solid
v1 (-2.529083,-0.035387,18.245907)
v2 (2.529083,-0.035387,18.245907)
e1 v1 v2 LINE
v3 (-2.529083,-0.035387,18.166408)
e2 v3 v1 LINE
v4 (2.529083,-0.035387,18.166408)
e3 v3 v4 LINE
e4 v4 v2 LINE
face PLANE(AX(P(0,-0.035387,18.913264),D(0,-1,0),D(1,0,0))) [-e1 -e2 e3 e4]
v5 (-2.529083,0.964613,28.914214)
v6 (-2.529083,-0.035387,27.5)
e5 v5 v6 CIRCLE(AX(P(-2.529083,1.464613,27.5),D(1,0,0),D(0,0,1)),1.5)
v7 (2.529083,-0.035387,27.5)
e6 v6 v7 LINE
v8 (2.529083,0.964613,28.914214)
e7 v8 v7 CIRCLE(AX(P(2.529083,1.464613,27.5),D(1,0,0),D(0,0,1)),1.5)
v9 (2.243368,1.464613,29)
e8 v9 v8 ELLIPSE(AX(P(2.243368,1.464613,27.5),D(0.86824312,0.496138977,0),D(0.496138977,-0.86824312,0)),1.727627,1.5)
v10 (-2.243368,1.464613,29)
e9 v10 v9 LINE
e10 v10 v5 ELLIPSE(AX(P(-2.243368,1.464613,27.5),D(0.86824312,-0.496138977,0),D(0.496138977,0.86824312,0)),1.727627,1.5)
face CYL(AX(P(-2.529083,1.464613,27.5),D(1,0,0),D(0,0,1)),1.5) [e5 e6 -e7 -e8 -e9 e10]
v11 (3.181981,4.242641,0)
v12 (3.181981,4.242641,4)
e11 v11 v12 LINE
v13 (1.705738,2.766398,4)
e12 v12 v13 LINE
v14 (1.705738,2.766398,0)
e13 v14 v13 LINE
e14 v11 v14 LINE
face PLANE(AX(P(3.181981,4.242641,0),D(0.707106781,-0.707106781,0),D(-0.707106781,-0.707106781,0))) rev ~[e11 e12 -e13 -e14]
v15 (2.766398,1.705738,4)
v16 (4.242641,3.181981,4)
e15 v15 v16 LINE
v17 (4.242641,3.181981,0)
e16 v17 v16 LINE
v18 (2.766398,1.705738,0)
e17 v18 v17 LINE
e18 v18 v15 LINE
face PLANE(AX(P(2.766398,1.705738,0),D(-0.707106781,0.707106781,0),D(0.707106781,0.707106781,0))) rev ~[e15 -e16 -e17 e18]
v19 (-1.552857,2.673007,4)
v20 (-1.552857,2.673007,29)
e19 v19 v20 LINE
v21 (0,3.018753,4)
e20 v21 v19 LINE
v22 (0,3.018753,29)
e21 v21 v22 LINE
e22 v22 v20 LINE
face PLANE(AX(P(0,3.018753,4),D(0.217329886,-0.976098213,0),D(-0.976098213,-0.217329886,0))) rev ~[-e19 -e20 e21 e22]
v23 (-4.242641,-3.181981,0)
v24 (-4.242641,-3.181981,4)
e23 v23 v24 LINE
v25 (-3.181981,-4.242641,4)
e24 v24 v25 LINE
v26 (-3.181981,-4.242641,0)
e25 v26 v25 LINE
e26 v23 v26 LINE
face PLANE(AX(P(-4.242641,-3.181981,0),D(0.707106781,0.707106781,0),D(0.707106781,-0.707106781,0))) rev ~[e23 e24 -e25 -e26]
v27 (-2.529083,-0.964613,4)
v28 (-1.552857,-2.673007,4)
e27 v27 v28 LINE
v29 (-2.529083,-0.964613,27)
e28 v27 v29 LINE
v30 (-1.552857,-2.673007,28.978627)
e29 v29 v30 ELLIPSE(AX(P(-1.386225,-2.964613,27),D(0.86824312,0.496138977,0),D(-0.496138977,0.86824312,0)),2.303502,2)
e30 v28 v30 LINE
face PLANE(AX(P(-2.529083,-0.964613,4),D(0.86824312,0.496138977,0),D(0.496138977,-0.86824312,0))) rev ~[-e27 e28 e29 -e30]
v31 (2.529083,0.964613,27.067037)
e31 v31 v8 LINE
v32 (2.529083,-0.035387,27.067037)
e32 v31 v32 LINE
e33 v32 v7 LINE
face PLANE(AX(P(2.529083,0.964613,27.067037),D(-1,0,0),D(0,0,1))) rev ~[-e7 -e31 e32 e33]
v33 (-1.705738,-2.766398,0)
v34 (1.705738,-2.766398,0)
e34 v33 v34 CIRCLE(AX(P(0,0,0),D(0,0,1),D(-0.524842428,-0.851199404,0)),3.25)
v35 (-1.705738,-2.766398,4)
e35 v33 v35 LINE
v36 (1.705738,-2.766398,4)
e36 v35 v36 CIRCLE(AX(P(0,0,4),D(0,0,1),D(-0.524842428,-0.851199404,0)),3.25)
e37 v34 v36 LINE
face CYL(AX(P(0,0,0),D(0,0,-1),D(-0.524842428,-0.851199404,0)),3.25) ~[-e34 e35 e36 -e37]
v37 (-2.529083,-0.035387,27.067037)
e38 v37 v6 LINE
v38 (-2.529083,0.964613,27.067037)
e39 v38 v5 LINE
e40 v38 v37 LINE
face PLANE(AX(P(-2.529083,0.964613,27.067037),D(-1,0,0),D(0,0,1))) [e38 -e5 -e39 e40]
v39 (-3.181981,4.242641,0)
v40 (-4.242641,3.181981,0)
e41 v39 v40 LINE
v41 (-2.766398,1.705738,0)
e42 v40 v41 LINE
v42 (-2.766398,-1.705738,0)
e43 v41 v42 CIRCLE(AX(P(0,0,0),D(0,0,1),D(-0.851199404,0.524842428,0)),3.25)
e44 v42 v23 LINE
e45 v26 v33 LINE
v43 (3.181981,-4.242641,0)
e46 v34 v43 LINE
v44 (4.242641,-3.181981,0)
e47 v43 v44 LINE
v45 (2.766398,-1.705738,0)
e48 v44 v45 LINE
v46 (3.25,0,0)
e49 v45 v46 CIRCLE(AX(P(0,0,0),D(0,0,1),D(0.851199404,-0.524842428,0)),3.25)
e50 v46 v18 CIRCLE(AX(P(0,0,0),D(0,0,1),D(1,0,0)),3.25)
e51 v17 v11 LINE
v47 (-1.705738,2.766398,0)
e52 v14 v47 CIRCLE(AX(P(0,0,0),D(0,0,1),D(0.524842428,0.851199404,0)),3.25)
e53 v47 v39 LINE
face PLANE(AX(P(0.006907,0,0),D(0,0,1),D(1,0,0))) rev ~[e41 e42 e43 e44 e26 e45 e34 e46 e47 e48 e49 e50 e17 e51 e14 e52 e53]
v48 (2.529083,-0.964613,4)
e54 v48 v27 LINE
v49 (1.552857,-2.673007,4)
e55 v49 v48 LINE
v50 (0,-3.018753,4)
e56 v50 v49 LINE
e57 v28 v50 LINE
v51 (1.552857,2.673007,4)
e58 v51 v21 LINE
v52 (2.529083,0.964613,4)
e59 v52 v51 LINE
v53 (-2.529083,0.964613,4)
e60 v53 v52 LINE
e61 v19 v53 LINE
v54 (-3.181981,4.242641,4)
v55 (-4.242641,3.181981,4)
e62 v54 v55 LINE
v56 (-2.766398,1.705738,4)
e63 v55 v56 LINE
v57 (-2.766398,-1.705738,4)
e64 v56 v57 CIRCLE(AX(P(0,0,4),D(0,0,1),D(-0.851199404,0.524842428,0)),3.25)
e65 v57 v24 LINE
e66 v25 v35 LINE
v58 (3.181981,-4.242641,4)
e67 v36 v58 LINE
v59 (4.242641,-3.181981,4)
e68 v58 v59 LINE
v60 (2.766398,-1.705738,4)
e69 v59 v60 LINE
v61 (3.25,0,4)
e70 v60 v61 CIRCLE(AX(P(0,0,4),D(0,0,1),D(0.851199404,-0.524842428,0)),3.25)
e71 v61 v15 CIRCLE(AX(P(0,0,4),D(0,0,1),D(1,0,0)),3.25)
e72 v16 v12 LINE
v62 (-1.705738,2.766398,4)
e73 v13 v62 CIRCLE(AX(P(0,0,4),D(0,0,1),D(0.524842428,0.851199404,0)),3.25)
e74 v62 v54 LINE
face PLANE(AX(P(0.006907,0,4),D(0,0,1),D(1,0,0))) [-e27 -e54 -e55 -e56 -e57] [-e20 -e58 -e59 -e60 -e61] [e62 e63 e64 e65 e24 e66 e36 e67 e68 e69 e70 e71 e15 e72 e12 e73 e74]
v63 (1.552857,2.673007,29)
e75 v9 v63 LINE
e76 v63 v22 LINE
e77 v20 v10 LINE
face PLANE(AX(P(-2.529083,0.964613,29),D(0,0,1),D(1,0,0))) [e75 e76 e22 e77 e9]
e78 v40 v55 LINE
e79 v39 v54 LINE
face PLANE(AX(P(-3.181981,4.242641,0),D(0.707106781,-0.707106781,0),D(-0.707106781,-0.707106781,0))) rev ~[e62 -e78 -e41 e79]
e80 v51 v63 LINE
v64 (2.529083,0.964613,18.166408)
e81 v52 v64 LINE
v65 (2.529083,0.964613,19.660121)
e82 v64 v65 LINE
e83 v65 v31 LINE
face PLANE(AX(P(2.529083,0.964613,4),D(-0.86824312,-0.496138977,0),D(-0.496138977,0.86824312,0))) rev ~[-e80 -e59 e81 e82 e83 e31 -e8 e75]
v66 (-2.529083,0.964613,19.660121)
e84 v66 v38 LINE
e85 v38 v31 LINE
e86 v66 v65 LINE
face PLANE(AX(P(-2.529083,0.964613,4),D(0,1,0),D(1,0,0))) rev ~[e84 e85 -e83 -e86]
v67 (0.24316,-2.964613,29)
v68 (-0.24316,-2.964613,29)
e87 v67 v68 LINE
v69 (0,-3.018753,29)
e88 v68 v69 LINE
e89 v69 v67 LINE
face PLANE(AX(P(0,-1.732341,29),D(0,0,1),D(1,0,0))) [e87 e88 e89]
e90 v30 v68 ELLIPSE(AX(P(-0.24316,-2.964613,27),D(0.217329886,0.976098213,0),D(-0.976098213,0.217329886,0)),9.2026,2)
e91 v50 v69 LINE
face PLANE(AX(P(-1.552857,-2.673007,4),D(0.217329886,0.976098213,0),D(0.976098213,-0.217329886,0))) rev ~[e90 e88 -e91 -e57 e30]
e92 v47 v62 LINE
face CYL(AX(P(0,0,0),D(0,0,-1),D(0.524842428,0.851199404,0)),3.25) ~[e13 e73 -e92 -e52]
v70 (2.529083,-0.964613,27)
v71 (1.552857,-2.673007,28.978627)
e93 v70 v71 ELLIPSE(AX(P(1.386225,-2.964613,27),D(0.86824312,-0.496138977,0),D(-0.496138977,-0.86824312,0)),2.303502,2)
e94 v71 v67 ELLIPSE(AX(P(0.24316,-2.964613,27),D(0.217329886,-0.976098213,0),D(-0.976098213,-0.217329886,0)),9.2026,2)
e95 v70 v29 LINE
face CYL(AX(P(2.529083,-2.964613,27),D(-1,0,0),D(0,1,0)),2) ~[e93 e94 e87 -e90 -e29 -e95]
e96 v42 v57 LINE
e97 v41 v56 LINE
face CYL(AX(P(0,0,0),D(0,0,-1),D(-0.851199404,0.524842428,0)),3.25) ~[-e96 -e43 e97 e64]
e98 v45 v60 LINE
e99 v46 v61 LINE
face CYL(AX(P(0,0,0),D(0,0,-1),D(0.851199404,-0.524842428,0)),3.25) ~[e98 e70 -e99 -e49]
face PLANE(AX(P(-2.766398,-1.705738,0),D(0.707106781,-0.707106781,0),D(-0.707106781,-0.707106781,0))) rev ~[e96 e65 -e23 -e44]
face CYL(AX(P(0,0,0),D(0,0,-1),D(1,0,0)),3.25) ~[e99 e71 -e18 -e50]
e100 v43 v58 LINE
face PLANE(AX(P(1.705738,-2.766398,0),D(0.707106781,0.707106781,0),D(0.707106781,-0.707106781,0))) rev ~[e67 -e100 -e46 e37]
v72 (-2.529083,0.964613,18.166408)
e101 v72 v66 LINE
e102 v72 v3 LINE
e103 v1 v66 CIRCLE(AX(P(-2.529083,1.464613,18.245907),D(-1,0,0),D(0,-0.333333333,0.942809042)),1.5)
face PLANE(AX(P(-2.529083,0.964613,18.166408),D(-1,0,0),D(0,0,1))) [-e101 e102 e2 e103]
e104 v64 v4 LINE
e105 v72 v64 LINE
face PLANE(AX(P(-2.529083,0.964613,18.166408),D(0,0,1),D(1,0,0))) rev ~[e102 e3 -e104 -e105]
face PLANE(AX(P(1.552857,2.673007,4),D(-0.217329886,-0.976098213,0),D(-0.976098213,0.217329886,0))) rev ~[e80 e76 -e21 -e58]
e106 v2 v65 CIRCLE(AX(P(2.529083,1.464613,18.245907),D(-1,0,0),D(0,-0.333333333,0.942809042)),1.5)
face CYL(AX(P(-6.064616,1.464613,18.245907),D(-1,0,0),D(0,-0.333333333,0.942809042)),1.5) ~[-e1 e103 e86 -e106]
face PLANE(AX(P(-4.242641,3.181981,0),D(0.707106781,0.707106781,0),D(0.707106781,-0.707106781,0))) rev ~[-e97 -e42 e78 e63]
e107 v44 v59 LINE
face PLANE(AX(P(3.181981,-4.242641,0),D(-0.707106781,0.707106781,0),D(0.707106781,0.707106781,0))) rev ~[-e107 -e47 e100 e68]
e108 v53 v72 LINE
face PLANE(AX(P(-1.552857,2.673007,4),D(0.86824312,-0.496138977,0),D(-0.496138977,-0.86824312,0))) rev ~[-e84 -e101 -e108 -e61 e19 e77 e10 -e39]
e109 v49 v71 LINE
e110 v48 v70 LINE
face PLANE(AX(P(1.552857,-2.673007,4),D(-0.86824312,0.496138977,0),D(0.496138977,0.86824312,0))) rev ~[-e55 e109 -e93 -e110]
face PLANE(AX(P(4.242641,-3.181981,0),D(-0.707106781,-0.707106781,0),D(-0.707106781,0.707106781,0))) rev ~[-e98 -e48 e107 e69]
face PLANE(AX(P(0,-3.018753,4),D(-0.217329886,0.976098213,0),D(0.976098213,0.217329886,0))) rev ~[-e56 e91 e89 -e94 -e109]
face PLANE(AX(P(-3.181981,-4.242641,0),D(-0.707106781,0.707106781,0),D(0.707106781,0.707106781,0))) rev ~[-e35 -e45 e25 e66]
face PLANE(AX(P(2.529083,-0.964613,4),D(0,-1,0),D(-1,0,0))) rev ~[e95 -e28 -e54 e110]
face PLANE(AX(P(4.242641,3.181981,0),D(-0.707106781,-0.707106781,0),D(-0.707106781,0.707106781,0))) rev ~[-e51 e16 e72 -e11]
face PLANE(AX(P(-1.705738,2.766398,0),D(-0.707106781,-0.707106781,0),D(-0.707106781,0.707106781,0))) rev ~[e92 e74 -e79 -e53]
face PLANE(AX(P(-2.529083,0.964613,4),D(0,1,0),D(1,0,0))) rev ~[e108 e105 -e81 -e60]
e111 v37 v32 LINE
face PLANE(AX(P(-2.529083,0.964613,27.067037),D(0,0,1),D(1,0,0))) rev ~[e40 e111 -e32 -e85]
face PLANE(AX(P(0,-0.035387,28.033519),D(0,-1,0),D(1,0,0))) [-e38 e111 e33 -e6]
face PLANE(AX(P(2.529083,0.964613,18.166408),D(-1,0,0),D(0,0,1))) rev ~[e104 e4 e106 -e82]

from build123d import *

# Parameters (mm, degrees)
F1_DEPTH     = 4
F3_DEPTH     = 25
F4_R         = 2
F5_W         = 5.058165174
F5_H         = 1.9329627007
F6_DEPTH     = 1
F7_R         = 1.5
F8_W         = 5.058165174
F8_H         = 1.4937128872
F9_DEPTH     = 1
F10_T1_DEPTH = 12.1292329858


# Not quite as in the source:
# - a fillet or chamfer that OpenCascade refuses, or shapes differently, is made with other operations: its cross-section is extruded or revolved along the edge and cut away or added


with BuildPart() as f1:
    # F0 (on Top) → F1 (new body)
    with BuildSketch(Plane.XY):
        with BuildLine():
            ThreePointArc((2.7663980634, -1.7057378916), (3.1267629992, -0.8864835853), (3.25, 0))
            ThreePointArc((3.25, 0), (3.1267629992, 0.8864835853), (2.7663980634, 1.7057378916))
            ThreePointArc((2.7663980634, 1.7057378916), (2.2980970389, 2.2980970389), (1.7057378916, 2.7663980634))
            ThreePointArc((1.7057378916, 2.7663980634), (0, 3.25), (-1.7057378916, 2.7663980634))
            ThreePointArc((-1.7057378916, 2.7663980634), (-2.2980970389, 2.2980970389), (-2.7663980634, 1.7057378916))
            ThreePointArc((-2.7663980634, 1.7057378916), (-3.25, 0), (-2.7663980634, -1.7057378916))
            ThreePointArc((-2.7663980634, -1.7057378916), (-2.2980970389, -2.2980970389), (-1.7057378916, -2.7663980634))
            ThreePointArc((-1.7057378916, -2.7663980634), (0, -3.25), (1.7057378916, -2.7663980634))
            ThreePointArc((1.7057378916, -2.7663980634), (2.2980970389, -2.2980970389), (2.7663980634, -1.7057378916))
        make_face()
        with BuildLine():
            ThreePointArc((1.7057378916, 2.7663980634), (2.2980970389, 2.2980970389), (2.7663980634, 1.7057378916))
            Line((2.7663980634, 1.7057378916), (4.2426406871, 3.1819805153))
            Line((4.2426406871, 3.1819805153), (3.7123106012, 3.7123106012))
            Line((3.7123106012, 3.7123106012), (3.1819805153, 4.2426406871))
            Line((3.1819805153, 4.2426406871), (1.7057378916, 2.7663980634))
        make_face()
        with BuildLine():
            Line((4.2426406871, -3.1819805153), (2.7663980634, -1.7057378916))
            ThreePointArc((2.7663980634, -1.7057378916), (2.2980970389, -2.2980970389), (1.7057378916, -2.7663980634))
            Line((1.7057378916, -2.7663980634), (3.1819805153, -4.2426406871))
            Line((3.1819805153, -4.2426406871), (3.7123106012, -3.7123106012))
            Line((3.7123106012, -3.7123106012), (4.2426406871, -3.1819805153))
        make_face()
        with BuildLine():
            ThreePointArc((-2.7663980634, 1.7057378916), (-2.2980970389, 2.2980970389), (-1.7057378916, 2.7663980634))
            Line((-1.7057378916, 2.7663980634), (-3.1819805153, 4.2426406871))
            Line((-3.1819805153, 4.2426406871), (-3.7123106012, 3.7123106012))
            Line((-3.7123106012, 3.7123106012), (-4.2426406871, 3.1819805153))
            Line((-4.2426406871, 3.1819805153), (-2.7663980634, 1.7057378916))
        make_face()
        with BuildLine():
            Line((-3.1819805153, -4.2426406871), (-1.7057378916, -2.7663980634))
            ThreePointArc((-1.7057378916, -2.7663980634), (-2.2980970389, -2.2980970389), (-2.7663980634, -1.7057378916))
            Line((-2.7663980634, -1.7057378916), (-4.2426406871, -3.1819805153))
            Line((-4.2426406871, -3.1819805153), (-3.7123106012, -3.7123106012))
            Line((-3.7123106012, -3.7123106012), (-3.1819805153, -4.2426406871))
        make_face()
    extrude(amount=F1_DEPTH)

    # F2 (on face) → F3 (join)
    with BuildSketch(Plane.XY.offset(4)):
        Polygon((-1.5528574586, 2.6730068494), (-2.529082587, 0.9646130493), (2.529082587, 0.9646130493), (1.5528574586, 2.6730068494), (0, 3.0187531374), align=None)
        Polygon((2.529082587, -0.9646130493), (-2.529082587, -0.9646130493), (-1.5528574586, -2.6730068494), (0, -3.0187531374), (1.5528574586, -2.6730068494), align=None)
    extrude(amount=F3_DEPTH)

    # F4
    f4_edges = [f1.edges().sort_by_distance(p)[0] for p in [
        (0, -0.964613, 29),
    ]]
    fillet(f4_edges, radius=F4_R)

    # F5 (on face) → F6 (join)
    with BuildSketch(Plane.XZ.offset(-0.9646130493)):
        with Locations((0, 28.0335186496)):
            Rectangle(F5_W, F5_H)
    extrude(amount=F6_DEPTH)

    # F7
    f7_edges = [f1.edges().sort_by_distance(p)[0] for p in [
        (0, -0.035387, 29),
    ]]
    fillet(f7_edges, radius=F7_R)

    # F8 (on face) → F9 (join)
    with BuildSketch(Plane.XZ.offset(-0.9646130493)):
        with Locations((0, 18.9132643864)):
            Rectangle(F8_W, F8_H)
    extrude(amount=F9_DEPTH)

    # F10: fillet of radius 1.5 on 1 edges, made by hand

    # F10_s2 → F10_t1 (cut)
    with BuildSketch(Plane.YZ.offset(-6.0646164929)):
        with BuildLine():
            ThreePointArc((0.9646130493, 19.6601208299), (0.2398681779, 19.1119326714), (-0.0353869507, 18.2459072676))
            Line((-0.0353869507, 18.2459072676), (-0.0353869507, 19.6601208299))
            Line((-0.0353869507, 19.6601208299), (0.9646130493, 19.6601208299))
        make_face()
    extrude(amount=F10_T1_DEPTH, mode=Mode.SUBTRACT)


solid = f1.part
